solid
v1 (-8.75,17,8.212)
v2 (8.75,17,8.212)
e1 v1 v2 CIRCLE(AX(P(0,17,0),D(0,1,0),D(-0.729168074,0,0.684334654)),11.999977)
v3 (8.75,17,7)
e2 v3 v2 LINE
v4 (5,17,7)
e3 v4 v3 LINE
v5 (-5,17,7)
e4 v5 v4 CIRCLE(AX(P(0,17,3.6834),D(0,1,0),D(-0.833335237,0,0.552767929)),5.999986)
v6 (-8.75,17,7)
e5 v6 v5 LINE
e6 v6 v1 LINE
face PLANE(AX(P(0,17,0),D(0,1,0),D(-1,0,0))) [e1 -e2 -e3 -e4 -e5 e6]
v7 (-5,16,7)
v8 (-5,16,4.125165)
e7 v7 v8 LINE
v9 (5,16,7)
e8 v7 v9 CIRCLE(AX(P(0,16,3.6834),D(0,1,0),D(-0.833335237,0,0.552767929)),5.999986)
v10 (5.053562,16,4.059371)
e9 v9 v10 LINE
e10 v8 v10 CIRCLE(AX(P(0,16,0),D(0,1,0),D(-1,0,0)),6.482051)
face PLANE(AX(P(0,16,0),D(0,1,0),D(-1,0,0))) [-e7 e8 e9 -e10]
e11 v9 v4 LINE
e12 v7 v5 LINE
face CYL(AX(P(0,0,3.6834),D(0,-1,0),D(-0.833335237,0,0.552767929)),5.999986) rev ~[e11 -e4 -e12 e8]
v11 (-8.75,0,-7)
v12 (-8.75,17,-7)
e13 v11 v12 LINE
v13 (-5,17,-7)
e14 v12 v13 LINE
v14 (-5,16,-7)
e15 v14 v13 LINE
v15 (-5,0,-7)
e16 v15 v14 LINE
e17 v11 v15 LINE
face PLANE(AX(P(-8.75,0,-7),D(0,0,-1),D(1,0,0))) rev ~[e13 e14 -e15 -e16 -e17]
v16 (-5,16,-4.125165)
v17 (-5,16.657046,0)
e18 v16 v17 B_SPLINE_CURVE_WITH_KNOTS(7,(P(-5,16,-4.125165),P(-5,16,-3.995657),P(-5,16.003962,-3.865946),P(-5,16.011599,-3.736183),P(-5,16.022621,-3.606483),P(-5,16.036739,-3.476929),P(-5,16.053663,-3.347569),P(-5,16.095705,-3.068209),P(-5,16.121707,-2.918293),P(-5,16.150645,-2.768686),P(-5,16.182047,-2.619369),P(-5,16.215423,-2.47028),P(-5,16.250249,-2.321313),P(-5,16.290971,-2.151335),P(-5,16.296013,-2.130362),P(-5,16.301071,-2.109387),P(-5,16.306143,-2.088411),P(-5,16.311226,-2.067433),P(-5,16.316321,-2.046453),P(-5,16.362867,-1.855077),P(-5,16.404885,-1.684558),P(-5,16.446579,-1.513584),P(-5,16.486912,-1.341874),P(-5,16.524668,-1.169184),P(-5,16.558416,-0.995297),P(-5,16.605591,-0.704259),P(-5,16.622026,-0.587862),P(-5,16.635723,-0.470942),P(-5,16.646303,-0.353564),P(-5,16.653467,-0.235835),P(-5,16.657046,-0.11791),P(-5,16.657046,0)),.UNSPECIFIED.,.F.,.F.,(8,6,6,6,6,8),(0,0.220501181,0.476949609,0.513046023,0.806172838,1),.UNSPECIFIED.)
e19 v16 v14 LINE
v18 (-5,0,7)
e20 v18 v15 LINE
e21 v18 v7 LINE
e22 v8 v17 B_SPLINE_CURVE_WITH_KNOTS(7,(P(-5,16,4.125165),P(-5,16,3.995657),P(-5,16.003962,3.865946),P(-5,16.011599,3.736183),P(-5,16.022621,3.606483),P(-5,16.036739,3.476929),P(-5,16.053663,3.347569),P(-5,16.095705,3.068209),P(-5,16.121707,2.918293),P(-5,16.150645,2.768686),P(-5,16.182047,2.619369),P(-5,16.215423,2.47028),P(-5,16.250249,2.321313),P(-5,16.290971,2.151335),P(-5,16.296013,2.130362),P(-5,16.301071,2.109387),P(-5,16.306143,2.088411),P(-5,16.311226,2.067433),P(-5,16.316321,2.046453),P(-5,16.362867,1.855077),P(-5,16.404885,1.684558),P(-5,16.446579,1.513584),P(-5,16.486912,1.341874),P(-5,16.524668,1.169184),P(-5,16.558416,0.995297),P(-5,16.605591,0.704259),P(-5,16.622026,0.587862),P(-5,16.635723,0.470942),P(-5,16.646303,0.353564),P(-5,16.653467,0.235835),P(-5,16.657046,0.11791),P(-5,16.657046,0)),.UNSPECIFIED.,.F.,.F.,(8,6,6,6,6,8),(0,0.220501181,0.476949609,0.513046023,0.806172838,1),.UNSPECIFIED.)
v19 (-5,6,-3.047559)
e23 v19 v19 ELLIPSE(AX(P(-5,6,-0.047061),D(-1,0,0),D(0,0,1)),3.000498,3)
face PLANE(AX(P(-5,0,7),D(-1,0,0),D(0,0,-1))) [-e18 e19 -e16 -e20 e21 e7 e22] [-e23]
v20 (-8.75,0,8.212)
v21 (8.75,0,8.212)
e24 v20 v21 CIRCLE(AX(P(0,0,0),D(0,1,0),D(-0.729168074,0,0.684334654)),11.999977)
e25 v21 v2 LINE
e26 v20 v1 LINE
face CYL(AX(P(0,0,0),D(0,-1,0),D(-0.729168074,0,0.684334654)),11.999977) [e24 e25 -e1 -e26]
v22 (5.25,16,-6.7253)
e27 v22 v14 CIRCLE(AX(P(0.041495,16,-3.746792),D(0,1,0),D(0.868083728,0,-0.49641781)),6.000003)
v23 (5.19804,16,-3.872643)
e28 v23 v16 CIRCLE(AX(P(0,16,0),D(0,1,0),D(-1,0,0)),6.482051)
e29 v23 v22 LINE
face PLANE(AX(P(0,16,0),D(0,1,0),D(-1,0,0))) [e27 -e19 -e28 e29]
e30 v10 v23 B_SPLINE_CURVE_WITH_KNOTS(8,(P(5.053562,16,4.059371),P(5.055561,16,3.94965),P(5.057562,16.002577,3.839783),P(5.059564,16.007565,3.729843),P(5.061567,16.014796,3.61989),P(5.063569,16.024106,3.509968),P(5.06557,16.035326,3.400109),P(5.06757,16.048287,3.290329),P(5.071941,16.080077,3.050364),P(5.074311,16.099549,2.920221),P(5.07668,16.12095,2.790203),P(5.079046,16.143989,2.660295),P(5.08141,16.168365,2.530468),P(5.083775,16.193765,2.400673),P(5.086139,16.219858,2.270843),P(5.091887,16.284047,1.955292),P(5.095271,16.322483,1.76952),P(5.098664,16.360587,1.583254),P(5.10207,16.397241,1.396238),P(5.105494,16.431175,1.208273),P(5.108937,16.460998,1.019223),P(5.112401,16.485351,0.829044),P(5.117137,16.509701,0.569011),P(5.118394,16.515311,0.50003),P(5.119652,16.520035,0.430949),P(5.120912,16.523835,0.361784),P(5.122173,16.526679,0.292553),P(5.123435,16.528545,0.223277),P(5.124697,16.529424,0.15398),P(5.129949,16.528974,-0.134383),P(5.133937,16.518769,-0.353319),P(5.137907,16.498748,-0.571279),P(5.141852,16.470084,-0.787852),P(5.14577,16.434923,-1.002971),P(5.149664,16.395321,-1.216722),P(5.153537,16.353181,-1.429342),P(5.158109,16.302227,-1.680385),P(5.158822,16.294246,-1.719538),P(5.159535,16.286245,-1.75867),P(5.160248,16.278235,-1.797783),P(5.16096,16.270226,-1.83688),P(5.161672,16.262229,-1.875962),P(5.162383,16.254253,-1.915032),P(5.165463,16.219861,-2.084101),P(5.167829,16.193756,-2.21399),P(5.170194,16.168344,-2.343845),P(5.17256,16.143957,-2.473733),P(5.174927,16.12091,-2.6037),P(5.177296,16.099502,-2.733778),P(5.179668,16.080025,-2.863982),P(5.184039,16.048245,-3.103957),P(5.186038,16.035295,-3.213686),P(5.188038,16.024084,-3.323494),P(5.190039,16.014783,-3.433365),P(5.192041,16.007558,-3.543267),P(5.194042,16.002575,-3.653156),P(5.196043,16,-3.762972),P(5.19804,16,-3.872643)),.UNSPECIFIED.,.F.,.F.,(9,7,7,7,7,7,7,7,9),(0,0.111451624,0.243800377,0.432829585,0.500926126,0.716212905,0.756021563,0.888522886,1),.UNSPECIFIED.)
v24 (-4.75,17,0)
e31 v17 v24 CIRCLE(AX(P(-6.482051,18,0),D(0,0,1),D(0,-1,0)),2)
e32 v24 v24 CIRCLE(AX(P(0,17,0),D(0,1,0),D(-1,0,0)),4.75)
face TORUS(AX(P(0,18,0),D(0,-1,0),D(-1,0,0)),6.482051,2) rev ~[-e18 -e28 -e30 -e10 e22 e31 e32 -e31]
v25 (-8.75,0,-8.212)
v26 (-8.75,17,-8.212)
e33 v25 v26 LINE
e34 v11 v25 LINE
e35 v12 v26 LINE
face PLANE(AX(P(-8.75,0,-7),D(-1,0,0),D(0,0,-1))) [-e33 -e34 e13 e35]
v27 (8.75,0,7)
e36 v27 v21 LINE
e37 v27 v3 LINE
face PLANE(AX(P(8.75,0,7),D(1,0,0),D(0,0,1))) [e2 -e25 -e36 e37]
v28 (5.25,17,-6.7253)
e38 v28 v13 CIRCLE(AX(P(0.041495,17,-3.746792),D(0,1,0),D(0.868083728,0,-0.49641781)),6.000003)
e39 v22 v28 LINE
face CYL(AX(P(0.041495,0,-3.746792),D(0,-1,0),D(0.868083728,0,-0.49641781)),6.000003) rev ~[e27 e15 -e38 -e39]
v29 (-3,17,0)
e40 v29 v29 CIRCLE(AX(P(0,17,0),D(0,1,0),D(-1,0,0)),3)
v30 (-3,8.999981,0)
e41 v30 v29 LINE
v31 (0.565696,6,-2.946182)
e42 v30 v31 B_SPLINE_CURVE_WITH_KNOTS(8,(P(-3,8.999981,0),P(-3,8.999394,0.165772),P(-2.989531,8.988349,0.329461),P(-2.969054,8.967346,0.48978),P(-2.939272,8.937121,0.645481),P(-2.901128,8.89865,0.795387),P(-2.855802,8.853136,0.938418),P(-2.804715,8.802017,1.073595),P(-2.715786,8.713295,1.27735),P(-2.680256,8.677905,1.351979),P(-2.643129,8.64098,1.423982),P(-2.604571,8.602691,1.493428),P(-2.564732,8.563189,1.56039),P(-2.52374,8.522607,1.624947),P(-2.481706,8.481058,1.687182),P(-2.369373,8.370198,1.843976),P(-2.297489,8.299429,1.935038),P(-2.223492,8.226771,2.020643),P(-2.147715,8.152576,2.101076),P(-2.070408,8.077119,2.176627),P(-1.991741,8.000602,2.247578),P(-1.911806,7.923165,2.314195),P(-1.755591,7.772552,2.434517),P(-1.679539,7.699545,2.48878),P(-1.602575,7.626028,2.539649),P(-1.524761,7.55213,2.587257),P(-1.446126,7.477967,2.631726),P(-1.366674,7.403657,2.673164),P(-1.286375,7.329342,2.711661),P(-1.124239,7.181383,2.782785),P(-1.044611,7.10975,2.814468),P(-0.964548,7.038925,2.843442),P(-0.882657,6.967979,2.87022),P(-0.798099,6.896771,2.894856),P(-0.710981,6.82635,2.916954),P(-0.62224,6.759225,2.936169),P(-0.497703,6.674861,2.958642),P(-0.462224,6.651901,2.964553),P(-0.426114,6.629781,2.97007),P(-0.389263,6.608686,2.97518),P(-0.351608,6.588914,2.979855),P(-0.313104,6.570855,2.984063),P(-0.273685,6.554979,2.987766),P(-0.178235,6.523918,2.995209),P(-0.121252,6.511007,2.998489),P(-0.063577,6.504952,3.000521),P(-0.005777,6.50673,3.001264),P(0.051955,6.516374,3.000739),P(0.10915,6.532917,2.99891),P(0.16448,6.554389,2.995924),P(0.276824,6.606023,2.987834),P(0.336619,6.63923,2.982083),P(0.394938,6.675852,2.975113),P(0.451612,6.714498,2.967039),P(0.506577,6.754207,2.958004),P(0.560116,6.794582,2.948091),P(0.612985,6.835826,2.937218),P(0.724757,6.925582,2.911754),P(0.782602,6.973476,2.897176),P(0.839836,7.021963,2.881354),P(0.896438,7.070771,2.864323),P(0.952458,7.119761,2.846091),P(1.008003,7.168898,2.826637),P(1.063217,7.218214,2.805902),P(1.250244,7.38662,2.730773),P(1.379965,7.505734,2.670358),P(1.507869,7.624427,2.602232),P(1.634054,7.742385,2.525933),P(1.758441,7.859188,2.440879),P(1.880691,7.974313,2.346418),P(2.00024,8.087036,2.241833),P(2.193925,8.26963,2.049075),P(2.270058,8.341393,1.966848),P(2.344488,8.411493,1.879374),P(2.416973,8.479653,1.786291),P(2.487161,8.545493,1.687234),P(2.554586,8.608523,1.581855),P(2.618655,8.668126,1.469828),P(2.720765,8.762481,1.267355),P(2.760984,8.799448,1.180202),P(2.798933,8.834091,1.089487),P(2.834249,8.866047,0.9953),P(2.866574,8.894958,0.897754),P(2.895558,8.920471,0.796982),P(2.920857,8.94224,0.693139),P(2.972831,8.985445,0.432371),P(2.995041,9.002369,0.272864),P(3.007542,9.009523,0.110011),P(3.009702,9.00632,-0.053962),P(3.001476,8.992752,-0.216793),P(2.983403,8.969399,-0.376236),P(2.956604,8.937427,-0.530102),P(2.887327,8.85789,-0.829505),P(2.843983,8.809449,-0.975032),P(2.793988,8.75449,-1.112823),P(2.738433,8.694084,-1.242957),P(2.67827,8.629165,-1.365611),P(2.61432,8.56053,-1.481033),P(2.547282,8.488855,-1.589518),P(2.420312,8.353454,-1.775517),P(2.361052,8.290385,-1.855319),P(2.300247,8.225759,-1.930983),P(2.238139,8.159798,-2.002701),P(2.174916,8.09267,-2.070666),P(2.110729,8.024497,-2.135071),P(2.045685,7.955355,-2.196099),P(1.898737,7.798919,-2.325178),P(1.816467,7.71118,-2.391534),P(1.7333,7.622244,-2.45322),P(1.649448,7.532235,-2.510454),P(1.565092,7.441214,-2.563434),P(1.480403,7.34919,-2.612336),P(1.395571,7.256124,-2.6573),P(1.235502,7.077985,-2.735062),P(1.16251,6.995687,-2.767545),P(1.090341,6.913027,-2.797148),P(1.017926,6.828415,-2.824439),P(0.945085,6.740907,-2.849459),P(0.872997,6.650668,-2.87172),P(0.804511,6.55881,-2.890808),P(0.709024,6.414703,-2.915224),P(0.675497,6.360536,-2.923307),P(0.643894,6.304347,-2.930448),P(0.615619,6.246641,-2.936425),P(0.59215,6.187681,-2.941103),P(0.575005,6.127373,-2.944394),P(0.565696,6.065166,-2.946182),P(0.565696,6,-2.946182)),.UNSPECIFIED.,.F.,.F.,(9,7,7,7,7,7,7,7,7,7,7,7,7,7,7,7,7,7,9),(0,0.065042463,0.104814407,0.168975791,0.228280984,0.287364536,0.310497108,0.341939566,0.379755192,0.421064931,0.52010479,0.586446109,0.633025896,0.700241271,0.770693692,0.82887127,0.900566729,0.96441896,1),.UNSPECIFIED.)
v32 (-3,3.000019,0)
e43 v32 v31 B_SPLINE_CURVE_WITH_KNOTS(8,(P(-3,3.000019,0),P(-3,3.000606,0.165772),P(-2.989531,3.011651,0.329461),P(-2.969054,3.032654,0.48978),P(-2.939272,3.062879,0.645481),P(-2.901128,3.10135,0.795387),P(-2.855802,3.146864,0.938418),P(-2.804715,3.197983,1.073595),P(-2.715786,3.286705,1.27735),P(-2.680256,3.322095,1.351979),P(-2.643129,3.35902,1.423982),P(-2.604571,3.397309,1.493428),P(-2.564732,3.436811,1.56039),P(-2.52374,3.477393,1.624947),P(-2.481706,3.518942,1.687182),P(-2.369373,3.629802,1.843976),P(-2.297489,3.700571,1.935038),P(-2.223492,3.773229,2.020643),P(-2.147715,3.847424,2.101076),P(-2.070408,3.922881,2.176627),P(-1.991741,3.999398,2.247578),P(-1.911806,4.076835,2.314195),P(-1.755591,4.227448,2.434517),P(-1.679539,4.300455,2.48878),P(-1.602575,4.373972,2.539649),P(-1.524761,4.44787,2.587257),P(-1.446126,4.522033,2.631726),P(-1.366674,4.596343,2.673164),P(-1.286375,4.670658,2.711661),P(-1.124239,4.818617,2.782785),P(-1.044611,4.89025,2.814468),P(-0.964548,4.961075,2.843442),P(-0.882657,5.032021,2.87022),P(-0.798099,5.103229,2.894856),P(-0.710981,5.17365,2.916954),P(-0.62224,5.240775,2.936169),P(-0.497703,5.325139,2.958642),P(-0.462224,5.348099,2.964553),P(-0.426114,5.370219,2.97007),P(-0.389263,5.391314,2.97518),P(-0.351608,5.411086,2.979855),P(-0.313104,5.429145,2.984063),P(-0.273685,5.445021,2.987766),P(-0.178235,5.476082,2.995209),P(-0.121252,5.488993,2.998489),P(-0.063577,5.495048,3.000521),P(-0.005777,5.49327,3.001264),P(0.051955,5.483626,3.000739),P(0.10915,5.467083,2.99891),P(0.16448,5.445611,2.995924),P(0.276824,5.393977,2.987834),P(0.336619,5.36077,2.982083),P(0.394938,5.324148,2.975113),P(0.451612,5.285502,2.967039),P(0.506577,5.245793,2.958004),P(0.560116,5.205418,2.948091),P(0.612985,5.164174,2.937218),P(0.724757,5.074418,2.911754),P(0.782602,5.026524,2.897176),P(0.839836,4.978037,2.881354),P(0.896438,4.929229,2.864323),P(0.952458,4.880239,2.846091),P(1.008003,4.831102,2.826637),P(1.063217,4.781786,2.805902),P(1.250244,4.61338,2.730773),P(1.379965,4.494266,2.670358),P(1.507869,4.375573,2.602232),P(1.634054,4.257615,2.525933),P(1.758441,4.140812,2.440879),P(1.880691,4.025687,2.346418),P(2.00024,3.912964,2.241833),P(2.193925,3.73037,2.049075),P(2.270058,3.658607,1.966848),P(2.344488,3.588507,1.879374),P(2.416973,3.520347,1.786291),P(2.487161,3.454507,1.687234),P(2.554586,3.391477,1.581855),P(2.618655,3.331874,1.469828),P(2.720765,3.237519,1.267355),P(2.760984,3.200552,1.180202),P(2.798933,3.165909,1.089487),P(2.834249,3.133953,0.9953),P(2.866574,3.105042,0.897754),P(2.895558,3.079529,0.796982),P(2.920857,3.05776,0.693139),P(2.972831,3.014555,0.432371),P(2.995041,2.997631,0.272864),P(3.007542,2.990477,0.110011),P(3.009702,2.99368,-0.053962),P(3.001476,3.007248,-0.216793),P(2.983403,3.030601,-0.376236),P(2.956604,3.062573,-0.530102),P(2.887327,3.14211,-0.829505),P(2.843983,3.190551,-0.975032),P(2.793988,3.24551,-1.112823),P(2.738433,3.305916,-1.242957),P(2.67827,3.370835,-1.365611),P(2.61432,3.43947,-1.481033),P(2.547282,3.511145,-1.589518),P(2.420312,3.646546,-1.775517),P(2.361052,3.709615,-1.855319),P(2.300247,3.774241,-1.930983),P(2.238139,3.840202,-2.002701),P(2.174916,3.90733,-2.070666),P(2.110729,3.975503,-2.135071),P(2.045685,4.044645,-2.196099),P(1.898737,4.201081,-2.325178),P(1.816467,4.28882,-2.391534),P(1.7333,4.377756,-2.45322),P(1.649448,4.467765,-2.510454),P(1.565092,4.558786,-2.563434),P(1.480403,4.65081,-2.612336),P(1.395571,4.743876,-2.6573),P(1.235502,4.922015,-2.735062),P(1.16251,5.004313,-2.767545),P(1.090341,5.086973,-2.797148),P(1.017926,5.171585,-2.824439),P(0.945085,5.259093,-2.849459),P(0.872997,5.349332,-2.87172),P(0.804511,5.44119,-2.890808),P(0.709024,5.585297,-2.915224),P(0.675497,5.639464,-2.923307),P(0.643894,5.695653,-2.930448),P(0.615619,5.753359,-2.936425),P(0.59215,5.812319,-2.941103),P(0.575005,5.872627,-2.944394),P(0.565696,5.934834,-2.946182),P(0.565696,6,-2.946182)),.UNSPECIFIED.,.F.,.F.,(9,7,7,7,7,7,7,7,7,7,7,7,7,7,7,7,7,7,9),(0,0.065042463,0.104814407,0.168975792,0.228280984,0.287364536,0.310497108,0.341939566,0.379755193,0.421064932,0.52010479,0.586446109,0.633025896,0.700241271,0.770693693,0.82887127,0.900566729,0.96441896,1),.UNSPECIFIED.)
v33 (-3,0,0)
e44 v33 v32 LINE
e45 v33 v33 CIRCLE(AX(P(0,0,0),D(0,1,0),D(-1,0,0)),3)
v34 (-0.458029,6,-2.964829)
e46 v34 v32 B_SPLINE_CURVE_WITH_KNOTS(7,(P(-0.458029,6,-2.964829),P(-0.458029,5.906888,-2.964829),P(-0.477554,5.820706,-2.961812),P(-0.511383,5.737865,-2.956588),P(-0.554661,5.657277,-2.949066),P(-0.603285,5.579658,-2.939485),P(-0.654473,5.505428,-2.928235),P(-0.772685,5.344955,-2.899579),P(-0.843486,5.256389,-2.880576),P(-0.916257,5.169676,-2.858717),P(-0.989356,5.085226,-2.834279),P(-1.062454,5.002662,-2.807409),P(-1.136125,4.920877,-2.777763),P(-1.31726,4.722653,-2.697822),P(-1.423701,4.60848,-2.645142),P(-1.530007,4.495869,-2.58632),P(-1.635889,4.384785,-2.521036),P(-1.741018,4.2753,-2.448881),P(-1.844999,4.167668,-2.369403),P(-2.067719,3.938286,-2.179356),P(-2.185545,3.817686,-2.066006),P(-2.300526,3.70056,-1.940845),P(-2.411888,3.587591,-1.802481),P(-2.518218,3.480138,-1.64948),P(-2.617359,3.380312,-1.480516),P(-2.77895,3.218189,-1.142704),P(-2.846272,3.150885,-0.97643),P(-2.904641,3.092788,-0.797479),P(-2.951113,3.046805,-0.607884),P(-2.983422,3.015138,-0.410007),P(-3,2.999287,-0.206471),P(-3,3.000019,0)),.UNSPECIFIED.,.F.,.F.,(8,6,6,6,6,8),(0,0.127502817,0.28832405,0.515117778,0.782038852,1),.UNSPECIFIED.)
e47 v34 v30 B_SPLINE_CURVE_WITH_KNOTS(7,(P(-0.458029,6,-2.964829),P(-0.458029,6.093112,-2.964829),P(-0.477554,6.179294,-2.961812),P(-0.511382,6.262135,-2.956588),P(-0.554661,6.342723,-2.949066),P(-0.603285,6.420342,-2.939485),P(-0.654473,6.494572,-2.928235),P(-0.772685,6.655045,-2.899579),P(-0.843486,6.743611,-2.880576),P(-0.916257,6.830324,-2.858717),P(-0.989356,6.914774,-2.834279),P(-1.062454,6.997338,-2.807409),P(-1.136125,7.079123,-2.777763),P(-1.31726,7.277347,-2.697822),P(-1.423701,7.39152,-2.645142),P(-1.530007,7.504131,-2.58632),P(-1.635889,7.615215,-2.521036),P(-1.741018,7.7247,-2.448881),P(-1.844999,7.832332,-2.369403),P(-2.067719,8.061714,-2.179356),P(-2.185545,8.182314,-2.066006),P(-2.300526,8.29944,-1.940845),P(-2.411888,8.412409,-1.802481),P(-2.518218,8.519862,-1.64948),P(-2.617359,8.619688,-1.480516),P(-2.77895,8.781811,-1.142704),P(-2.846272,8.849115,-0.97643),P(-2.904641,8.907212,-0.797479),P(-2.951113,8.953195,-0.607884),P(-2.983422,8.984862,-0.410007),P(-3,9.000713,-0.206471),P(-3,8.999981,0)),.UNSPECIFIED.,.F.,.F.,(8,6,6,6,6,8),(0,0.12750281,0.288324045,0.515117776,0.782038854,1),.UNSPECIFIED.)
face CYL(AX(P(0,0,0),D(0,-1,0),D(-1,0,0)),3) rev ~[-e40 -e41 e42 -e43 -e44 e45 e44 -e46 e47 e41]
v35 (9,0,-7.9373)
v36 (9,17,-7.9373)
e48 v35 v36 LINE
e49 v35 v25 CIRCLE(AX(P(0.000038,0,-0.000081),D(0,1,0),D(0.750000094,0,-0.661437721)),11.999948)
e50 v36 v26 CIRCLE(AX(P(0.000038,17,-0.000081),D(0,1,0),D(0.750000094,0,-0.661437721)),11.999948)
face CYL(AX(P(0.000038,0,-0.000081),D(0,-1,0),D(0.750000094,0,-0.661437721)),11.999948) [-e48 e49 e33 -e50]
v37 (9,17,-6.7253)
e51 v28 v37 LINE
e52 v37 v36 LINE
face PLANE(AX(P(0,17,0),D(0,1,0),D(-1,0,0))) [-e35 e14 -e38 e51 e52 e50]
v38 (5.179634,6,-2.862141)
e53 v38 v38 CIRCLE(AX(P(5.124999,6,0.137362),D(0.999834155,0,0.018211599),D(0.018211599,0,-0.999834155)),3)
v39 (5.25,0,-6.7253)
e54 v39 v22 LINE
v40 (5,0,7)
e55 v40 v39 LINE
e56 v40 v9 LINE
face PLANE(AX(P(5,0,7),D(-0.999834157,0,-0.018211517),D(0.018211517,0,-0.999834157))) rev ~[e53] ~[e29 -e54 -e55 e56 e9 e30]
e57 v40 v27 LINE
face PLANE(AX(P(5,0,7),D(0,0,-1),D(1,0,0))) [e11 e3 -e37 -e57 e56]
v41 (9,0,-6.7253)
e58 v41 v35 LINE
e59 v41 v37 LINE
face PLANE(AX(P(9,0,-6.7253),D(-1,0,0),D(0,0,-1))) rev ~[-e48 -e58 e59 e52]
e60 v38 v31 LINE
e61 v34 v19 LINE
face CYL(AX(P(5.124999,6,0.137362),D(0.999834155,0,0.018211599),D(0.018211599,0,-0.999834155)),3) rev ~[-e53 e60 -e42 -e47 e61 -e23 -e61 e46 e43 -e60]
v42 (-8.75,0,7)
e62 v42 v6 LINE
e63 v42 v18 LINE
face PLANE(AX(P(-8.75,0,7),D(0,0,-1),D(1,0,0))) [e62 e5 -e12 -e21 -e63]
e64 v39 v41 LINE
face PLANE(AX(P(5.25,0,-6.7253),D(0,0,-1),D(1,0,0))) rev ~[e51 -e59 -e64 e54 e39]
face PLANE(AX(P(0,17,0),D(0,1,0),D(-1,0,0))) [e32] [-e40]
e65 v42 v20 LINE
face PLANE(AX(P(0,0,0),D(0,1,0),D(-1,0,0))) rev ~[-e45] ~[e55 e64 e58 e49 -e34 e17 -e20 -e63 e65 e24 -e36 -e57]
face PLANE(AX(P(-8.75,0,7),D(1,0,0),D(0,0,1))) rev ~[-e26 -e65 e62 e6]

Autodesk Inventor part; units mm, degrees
ref_plane "YZ Plane" through (0, 0, 0) normal (1, 0, 0) x (0, 1, 0)
ref_plane "XZ Plane" through (0, 0, 0) normal (0, 1, 0) x (-1, 0, 0)
ref_plane "XY Plane" through (0, 0, 0) normal (0, 0, 1) x (1, 0, 0)
sketch "Sketch1" plane through (0, 0, 0) normal (0, 1, 0) x (-1, 0, 0)
  circle A0 centre (0, 0) radius 12 construction
  line L0 (8.75, -7) -> (5, -7)
  line L1 (8.75, 7) -> (5, 7)
  line L2 (-5, 7) -> (-8.75, 7)
  line L3 (-5.25, -6.7253) -> (-9, -6.7253)
  line L4 (8.75, -7) -> (8.75, -8.212)
  line L5 (8.75, 7) -> (8.75, 8.212)
  line L6 (-8.75, 7) -> (-8.75, 8.212)
  arc A1 (8.75, 8.212) -> (-8.75, 8.212) centre (0, 0) ccw
  arc A2 (5, 7) -> (-5, 7) centre (0, 3.6834) ccw
  line L7 (-9, -6.7253) -> (-9, -7.9373)
  arc A3 (-9, -7.9373) -> (8.75, -8.212) centre (0, 0) ccw
  arc A4 (-5.25, -6.7253) -> (5, -7) centre (-0.0415, -3.7468) ccw
  circle A5 centre (0, 0) radius 4.75
  circle A6 centre (0, 0) radius 3
  line L8 (5, 7) -> (5, -7)
  line L9 (-5, 7) -> (-5.25, -6.7253)
  dimension "d0" = 24
  dimension "d2" = 3.75
  dimension "d3" = 3.75
  dimension "d5" = 3.75
  dimension "d6" = 3.75
  dimension "d28" = 8.75
  dimension "d29" = 14
  dimension "d31" = 1.212
  dimension "d32" = 1.212
  dimension "d33" = 6
  dimension "d34" = 1.212
  dimension "d35" = 1.212
  dimension "d49" = 9.5
  dimension "d50" = 6
  dimension "d51" = 1.044
extrude "Extrusion3" add sketch "Sketch1" along normal blind 16 contours A4 L9 A2 L8
extrude "Extrusion5" add sketch "Sketch1" along normal blind 17 contours L4 A3 L7 L3 A4 L0 | A2 L2 L6 A1 L5 L1 | A5
sketch "Sketch2" plane through (5.25, 0, -6.7253) normal (0.9998342, 0, 0.0182116) x (0.0182116, 0, -0.9998342)
  line L0 (-13.7275, 0) -> (0, 0) projected
  line L1 (0, 0) -> (0, 16) projected
  line L2 (-13.7275, 16) -> (0, 16) projected
  line L3 (-13.7275, 0) -> (-13.7275, 16) projected
  circle A0 centre (-6.8638, 6) radius 3
  line L4 (2.9272, 16) -> (0, 16) projected
  line L5 (0.0881, 0) -> (-13.9096, 0) projected
  line L6 (-13.9096, 0) -> (-13.9096, 16) projected
  line L7 (0.0881, 16) -> (-13.9096, 16) projected
  line L8 (0.0881, 0) -> (0.0881, 16) projected
  point P0 (-6.8197, 0)
  dimension "d54" = 6
  dimension "d55" = 6
extrude "Extrusion6" cut sketch "Sketch2" against normal through all contours A0
fillet "Fillet1" radius 2 1 edges at (4.75, 16, 0)
properties part number "reverse gear cross head 1"
